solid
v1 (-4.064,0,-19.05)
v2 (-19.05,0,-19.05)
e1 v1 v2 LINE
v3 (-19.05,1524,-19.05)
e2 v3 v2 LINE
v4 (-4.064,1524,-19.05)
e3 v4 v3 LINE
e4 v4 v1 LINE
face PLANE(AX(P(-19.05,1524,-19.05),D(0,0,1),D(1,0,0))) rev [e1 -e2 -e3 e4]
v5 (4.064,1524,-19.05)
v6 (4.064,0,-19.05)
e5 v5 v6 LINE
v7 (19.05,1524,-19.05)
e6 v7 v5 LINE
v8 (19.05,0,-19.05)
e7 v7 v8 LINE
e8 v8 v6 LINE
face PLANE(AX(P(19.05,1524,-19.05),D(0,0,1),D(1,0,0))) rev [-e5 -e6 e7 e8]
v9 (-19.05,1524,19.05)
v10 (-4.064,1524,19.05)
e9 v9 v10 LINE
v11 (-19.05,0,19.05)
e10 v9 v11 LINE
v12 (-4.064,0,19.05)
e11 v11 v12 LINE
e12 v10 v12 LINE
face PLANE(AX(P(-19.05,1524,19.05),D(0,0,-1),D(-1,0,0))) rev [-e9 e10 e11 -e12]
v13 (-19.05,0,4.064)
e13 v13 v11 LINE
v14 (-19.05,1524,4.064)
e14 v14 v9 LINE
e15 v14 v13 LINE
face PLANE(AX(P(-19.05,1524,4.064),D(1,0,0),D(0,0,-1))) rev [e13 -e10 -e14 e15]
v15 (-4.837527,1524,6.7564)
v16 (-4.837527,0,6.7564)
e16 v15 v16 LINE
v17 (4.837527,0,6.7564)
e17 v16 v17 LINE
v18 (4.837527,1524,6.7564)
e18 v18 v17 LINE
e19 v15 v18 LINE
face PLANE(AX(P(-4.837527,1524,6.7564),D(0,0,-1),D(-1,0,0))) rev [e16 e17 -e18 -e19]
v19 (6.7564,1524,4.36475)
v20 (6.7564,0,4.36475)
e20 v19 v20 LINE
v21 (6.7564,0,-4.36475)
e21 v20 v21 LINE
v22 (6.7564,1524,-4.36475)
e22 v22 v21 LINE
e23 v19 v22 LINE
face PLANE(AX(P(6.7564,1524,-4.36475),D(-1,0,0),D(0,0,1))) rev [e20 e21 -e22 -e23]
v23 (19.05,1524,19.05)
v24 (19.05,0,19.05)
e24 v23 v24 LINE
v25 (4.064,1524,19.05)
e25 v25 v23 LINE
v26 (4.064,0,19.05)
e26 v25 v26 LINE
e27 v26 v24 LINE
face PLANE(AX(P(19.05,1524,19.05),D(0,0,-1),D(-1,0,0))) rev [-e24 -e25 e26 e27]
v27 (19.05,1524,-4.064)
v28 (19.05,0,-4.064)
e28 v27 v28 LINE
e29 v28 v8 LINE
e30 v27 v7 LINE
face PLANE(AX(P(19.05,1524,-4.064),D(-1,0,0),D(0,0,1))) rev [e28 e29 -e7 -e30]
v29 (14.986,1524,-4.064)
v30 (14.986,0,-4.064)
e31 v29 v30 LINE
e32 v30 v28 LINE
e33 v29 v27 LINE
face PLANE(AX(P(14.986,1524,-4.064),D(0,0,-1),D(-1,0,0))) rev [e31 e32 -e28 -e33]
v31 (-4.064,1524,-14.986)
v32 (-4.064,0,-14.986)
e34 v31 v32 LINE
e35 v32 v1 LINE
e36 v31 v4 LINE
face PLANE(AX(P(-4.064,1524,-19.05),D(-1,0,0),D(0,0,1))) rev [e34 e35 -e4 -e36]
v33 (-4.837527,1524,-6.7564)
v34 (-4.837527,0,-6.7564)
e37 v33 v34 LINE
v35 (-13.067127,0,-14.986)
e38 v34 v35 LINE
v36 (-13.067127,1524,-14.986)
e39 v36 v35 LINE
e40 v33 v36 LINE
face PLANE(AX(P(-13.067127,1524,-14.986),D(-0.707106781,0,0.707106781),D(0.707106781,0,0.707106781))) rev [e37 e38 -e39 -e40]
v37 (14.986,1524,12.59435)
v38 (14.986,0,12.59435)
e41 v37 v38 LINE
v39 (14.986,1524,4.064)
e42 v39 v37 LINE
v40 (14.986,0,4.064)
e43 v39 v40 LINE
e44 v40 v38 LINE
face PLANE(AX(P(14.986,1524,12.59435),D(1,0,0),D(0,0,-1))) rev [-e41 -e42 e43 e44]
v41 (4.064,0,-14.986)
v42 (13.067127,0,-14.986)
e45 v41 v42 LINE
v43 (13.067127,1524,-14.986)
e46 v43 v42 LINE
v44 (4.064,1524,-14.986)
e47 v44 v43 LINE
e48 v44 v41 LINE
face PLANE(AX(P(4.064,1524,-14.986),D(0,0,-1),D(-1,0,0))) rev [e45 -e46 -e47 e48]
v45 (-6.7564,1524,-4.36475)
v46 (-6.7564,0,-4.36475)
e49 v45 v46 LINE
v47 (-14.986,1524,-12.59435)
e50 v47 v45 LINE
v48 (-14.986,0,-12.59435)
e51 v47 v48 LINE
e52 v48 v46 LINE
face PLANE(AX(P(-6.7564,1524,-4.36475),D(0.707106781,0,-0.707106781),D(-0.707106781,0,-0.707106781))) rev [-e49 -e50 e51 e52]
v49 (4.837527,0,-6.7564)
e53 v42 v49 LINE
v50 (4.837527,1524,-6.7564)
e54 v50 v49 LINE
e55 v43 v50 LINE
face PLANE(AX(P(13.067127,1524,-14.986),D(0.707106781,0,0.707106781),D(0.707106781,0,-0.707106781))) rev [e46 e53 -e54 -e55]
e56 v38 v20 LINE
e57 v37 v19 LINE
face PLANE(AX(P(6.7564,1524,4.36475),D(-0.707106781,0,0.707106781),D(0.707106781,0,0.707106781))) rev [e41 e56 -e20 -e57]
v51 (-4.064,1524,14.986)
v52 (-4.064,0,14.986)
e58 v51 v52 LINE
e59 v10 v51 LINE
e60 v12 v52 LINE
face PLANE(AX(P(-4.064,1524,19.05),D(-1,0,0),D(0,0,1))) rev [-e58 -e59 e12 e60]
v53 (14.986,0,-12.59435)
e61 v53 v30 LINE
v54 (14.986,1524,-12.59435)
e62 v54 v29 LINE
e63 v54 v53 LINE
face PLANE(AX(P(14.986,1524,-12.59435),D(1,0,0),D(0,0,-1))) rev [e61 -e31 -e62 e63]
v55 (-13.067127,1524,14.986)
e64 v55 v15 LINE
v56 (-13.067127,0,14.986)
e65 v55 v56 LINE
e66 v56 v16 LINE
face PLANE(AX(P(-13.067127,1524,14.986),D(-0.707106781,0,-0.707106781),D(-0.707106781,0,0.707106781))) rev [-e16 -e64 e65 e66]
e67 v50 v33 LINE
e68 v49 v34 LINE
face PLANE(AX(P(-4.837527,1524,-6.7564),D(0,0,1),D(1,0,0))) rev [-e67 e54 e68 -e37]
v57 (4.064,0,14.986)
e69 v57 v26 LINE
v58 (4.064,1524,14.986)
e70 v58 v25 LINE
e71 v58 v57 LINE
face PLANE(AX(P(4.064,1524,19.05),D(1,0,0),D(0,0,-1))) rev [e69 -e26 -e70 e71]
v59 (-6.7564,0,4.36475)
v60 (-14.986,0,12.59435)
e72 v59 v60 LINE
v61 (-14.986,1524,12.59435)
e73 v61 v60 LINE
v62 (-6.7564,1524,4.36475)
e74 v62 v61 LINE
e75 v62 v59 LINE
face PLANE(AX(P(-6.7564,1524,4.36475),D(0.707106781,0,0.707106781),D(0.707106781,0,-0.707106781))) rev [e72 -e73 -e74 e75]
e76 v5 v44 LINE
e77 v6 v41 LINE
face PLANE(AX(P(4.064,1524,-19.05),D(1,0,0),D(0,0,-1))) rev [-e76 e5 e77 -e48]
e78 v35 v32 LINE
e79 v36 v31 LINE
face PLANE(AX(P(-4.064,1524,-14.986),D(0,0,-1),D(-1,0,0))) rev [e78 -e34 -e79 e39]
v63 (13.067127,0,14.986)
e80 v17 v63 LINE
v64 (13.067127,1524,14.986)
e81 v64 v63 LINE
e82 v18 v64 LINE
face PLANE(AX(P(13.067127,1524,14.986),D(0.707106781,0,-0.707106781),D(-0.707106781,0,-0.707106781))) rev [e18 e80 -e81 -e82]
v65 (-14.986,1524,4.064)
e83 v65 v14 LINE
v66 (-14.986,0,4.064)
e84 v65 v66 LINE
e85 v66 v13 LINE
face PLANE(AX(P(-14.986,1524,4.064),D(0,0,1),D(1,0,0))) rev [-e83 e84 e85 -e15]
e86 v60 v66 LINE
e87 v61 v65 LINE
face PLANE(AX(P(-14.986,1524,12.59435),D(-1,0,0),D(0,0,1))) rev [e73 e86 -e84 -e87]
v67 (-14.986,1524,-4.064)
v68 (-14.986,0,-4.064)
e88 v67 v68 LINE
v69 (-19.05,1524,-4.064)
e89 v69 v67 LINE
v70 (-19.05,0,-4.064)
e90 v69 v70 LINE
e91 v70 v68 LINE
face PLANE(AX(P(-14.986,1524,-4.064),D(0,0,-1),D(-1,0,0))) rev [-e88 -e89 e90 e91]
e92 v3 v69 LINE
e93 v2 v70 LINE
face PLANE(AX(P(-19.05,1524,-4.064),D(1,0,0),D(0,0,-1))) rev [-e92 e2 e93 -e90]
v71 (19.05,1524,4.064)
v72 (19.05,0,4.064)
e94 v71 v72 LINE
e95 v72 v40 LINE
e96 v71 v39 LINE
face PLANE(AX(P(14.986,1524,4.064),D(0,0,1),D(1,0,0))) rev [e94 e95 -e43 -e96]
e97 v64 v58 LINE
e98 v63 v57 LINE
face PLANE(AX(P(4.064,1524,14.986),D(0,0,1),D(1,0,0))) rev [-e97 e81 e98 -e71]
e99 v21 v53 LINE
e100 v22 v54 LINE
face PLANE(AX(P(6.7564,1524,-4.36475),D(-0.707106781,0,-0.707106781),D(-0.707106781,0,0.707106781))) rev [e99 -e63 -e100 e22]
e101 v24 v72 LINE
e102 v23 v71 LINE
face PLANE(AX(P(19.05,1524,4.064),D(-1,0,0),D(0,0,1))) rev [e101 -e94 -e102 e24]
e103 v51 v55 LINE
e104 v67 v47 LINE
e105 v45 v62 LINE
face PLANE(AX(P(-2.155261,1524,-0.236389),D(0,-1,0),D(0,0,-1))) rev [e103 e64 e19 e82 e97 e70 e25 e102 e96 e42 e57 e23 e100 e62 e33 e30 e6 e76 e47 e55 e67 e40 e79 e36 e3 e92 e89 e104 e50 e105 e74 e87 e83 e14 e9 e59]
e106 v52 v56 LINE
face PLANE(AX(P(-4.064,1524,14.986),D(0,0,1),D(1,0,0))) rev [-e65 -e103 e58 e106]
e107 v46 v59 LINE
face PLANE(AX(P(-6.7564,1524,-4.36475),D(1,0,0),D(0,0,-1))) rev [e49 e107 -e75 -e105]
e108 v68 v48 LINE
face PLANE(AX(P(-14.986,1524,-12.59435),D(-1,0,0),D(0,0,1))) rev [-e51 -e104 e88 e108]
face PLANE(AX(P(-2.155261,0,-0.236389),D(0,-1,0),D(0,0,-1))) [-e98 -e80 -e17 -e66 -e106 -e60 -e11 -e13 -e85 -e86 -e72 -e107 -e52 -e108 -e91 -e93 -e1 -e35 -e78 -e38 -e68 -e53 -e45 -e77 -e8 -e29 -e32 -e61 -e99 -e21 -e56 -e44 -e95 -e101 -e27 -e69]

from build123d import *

# Parameters (mm, degrees)
EXTRUDE1_DEPTH = 1524


# Read off the part's stored shape, not the designer's step: 1515<1>
with BuildPart() as part:
    # Sketch1<2> → Extrude1 (new body)
    with BuildSketch(Plane(origin=(0, 0, 0), x_dir=(1, 0, 0), z_dir=(0, 1, 0))):
        Polygon((-6.7564, 4.364749804), (-6.7564, -4.364749804), (-14.986, -12.594349804), (-14.986, -4.064), (-19.05, -4.064), (-19.05, -19.05), (-4.064, -19.05), (-4.064, -14.986), (-13.067127258, -14.986), (-4.837527258, -6.7564), (4.837527258, -6.7564), (13.067127258, -14.986), (4.064, -14.986), (4.064, -19.05), (19.05, -19.05), (19.05, -4.064), (14.986, -4.064), (14.986, -12.594349804), (6.7564, -4.364749804), (6.7564, 4.364749804), (14.986, 12.594349804), (14.986, 4.064), (19.05, 4.064), (19.05, 19.05), (4.064, 19.05), (4.064, 14.986), (13.067127258, 14.986), (4.837527258, 6.7564), (-4.837527258, 6.7564), (-13.067127258, 14.986), (-4.064, 14.986), (-4.064, 19.05), (-19.05, 19.05), (-19.05, 4.064), (-14.986, 4.064), (-14.986, 12.594349804), align=None)
    extrude(amount=EXTRUDE1_DEPTH)


solid = part.part
